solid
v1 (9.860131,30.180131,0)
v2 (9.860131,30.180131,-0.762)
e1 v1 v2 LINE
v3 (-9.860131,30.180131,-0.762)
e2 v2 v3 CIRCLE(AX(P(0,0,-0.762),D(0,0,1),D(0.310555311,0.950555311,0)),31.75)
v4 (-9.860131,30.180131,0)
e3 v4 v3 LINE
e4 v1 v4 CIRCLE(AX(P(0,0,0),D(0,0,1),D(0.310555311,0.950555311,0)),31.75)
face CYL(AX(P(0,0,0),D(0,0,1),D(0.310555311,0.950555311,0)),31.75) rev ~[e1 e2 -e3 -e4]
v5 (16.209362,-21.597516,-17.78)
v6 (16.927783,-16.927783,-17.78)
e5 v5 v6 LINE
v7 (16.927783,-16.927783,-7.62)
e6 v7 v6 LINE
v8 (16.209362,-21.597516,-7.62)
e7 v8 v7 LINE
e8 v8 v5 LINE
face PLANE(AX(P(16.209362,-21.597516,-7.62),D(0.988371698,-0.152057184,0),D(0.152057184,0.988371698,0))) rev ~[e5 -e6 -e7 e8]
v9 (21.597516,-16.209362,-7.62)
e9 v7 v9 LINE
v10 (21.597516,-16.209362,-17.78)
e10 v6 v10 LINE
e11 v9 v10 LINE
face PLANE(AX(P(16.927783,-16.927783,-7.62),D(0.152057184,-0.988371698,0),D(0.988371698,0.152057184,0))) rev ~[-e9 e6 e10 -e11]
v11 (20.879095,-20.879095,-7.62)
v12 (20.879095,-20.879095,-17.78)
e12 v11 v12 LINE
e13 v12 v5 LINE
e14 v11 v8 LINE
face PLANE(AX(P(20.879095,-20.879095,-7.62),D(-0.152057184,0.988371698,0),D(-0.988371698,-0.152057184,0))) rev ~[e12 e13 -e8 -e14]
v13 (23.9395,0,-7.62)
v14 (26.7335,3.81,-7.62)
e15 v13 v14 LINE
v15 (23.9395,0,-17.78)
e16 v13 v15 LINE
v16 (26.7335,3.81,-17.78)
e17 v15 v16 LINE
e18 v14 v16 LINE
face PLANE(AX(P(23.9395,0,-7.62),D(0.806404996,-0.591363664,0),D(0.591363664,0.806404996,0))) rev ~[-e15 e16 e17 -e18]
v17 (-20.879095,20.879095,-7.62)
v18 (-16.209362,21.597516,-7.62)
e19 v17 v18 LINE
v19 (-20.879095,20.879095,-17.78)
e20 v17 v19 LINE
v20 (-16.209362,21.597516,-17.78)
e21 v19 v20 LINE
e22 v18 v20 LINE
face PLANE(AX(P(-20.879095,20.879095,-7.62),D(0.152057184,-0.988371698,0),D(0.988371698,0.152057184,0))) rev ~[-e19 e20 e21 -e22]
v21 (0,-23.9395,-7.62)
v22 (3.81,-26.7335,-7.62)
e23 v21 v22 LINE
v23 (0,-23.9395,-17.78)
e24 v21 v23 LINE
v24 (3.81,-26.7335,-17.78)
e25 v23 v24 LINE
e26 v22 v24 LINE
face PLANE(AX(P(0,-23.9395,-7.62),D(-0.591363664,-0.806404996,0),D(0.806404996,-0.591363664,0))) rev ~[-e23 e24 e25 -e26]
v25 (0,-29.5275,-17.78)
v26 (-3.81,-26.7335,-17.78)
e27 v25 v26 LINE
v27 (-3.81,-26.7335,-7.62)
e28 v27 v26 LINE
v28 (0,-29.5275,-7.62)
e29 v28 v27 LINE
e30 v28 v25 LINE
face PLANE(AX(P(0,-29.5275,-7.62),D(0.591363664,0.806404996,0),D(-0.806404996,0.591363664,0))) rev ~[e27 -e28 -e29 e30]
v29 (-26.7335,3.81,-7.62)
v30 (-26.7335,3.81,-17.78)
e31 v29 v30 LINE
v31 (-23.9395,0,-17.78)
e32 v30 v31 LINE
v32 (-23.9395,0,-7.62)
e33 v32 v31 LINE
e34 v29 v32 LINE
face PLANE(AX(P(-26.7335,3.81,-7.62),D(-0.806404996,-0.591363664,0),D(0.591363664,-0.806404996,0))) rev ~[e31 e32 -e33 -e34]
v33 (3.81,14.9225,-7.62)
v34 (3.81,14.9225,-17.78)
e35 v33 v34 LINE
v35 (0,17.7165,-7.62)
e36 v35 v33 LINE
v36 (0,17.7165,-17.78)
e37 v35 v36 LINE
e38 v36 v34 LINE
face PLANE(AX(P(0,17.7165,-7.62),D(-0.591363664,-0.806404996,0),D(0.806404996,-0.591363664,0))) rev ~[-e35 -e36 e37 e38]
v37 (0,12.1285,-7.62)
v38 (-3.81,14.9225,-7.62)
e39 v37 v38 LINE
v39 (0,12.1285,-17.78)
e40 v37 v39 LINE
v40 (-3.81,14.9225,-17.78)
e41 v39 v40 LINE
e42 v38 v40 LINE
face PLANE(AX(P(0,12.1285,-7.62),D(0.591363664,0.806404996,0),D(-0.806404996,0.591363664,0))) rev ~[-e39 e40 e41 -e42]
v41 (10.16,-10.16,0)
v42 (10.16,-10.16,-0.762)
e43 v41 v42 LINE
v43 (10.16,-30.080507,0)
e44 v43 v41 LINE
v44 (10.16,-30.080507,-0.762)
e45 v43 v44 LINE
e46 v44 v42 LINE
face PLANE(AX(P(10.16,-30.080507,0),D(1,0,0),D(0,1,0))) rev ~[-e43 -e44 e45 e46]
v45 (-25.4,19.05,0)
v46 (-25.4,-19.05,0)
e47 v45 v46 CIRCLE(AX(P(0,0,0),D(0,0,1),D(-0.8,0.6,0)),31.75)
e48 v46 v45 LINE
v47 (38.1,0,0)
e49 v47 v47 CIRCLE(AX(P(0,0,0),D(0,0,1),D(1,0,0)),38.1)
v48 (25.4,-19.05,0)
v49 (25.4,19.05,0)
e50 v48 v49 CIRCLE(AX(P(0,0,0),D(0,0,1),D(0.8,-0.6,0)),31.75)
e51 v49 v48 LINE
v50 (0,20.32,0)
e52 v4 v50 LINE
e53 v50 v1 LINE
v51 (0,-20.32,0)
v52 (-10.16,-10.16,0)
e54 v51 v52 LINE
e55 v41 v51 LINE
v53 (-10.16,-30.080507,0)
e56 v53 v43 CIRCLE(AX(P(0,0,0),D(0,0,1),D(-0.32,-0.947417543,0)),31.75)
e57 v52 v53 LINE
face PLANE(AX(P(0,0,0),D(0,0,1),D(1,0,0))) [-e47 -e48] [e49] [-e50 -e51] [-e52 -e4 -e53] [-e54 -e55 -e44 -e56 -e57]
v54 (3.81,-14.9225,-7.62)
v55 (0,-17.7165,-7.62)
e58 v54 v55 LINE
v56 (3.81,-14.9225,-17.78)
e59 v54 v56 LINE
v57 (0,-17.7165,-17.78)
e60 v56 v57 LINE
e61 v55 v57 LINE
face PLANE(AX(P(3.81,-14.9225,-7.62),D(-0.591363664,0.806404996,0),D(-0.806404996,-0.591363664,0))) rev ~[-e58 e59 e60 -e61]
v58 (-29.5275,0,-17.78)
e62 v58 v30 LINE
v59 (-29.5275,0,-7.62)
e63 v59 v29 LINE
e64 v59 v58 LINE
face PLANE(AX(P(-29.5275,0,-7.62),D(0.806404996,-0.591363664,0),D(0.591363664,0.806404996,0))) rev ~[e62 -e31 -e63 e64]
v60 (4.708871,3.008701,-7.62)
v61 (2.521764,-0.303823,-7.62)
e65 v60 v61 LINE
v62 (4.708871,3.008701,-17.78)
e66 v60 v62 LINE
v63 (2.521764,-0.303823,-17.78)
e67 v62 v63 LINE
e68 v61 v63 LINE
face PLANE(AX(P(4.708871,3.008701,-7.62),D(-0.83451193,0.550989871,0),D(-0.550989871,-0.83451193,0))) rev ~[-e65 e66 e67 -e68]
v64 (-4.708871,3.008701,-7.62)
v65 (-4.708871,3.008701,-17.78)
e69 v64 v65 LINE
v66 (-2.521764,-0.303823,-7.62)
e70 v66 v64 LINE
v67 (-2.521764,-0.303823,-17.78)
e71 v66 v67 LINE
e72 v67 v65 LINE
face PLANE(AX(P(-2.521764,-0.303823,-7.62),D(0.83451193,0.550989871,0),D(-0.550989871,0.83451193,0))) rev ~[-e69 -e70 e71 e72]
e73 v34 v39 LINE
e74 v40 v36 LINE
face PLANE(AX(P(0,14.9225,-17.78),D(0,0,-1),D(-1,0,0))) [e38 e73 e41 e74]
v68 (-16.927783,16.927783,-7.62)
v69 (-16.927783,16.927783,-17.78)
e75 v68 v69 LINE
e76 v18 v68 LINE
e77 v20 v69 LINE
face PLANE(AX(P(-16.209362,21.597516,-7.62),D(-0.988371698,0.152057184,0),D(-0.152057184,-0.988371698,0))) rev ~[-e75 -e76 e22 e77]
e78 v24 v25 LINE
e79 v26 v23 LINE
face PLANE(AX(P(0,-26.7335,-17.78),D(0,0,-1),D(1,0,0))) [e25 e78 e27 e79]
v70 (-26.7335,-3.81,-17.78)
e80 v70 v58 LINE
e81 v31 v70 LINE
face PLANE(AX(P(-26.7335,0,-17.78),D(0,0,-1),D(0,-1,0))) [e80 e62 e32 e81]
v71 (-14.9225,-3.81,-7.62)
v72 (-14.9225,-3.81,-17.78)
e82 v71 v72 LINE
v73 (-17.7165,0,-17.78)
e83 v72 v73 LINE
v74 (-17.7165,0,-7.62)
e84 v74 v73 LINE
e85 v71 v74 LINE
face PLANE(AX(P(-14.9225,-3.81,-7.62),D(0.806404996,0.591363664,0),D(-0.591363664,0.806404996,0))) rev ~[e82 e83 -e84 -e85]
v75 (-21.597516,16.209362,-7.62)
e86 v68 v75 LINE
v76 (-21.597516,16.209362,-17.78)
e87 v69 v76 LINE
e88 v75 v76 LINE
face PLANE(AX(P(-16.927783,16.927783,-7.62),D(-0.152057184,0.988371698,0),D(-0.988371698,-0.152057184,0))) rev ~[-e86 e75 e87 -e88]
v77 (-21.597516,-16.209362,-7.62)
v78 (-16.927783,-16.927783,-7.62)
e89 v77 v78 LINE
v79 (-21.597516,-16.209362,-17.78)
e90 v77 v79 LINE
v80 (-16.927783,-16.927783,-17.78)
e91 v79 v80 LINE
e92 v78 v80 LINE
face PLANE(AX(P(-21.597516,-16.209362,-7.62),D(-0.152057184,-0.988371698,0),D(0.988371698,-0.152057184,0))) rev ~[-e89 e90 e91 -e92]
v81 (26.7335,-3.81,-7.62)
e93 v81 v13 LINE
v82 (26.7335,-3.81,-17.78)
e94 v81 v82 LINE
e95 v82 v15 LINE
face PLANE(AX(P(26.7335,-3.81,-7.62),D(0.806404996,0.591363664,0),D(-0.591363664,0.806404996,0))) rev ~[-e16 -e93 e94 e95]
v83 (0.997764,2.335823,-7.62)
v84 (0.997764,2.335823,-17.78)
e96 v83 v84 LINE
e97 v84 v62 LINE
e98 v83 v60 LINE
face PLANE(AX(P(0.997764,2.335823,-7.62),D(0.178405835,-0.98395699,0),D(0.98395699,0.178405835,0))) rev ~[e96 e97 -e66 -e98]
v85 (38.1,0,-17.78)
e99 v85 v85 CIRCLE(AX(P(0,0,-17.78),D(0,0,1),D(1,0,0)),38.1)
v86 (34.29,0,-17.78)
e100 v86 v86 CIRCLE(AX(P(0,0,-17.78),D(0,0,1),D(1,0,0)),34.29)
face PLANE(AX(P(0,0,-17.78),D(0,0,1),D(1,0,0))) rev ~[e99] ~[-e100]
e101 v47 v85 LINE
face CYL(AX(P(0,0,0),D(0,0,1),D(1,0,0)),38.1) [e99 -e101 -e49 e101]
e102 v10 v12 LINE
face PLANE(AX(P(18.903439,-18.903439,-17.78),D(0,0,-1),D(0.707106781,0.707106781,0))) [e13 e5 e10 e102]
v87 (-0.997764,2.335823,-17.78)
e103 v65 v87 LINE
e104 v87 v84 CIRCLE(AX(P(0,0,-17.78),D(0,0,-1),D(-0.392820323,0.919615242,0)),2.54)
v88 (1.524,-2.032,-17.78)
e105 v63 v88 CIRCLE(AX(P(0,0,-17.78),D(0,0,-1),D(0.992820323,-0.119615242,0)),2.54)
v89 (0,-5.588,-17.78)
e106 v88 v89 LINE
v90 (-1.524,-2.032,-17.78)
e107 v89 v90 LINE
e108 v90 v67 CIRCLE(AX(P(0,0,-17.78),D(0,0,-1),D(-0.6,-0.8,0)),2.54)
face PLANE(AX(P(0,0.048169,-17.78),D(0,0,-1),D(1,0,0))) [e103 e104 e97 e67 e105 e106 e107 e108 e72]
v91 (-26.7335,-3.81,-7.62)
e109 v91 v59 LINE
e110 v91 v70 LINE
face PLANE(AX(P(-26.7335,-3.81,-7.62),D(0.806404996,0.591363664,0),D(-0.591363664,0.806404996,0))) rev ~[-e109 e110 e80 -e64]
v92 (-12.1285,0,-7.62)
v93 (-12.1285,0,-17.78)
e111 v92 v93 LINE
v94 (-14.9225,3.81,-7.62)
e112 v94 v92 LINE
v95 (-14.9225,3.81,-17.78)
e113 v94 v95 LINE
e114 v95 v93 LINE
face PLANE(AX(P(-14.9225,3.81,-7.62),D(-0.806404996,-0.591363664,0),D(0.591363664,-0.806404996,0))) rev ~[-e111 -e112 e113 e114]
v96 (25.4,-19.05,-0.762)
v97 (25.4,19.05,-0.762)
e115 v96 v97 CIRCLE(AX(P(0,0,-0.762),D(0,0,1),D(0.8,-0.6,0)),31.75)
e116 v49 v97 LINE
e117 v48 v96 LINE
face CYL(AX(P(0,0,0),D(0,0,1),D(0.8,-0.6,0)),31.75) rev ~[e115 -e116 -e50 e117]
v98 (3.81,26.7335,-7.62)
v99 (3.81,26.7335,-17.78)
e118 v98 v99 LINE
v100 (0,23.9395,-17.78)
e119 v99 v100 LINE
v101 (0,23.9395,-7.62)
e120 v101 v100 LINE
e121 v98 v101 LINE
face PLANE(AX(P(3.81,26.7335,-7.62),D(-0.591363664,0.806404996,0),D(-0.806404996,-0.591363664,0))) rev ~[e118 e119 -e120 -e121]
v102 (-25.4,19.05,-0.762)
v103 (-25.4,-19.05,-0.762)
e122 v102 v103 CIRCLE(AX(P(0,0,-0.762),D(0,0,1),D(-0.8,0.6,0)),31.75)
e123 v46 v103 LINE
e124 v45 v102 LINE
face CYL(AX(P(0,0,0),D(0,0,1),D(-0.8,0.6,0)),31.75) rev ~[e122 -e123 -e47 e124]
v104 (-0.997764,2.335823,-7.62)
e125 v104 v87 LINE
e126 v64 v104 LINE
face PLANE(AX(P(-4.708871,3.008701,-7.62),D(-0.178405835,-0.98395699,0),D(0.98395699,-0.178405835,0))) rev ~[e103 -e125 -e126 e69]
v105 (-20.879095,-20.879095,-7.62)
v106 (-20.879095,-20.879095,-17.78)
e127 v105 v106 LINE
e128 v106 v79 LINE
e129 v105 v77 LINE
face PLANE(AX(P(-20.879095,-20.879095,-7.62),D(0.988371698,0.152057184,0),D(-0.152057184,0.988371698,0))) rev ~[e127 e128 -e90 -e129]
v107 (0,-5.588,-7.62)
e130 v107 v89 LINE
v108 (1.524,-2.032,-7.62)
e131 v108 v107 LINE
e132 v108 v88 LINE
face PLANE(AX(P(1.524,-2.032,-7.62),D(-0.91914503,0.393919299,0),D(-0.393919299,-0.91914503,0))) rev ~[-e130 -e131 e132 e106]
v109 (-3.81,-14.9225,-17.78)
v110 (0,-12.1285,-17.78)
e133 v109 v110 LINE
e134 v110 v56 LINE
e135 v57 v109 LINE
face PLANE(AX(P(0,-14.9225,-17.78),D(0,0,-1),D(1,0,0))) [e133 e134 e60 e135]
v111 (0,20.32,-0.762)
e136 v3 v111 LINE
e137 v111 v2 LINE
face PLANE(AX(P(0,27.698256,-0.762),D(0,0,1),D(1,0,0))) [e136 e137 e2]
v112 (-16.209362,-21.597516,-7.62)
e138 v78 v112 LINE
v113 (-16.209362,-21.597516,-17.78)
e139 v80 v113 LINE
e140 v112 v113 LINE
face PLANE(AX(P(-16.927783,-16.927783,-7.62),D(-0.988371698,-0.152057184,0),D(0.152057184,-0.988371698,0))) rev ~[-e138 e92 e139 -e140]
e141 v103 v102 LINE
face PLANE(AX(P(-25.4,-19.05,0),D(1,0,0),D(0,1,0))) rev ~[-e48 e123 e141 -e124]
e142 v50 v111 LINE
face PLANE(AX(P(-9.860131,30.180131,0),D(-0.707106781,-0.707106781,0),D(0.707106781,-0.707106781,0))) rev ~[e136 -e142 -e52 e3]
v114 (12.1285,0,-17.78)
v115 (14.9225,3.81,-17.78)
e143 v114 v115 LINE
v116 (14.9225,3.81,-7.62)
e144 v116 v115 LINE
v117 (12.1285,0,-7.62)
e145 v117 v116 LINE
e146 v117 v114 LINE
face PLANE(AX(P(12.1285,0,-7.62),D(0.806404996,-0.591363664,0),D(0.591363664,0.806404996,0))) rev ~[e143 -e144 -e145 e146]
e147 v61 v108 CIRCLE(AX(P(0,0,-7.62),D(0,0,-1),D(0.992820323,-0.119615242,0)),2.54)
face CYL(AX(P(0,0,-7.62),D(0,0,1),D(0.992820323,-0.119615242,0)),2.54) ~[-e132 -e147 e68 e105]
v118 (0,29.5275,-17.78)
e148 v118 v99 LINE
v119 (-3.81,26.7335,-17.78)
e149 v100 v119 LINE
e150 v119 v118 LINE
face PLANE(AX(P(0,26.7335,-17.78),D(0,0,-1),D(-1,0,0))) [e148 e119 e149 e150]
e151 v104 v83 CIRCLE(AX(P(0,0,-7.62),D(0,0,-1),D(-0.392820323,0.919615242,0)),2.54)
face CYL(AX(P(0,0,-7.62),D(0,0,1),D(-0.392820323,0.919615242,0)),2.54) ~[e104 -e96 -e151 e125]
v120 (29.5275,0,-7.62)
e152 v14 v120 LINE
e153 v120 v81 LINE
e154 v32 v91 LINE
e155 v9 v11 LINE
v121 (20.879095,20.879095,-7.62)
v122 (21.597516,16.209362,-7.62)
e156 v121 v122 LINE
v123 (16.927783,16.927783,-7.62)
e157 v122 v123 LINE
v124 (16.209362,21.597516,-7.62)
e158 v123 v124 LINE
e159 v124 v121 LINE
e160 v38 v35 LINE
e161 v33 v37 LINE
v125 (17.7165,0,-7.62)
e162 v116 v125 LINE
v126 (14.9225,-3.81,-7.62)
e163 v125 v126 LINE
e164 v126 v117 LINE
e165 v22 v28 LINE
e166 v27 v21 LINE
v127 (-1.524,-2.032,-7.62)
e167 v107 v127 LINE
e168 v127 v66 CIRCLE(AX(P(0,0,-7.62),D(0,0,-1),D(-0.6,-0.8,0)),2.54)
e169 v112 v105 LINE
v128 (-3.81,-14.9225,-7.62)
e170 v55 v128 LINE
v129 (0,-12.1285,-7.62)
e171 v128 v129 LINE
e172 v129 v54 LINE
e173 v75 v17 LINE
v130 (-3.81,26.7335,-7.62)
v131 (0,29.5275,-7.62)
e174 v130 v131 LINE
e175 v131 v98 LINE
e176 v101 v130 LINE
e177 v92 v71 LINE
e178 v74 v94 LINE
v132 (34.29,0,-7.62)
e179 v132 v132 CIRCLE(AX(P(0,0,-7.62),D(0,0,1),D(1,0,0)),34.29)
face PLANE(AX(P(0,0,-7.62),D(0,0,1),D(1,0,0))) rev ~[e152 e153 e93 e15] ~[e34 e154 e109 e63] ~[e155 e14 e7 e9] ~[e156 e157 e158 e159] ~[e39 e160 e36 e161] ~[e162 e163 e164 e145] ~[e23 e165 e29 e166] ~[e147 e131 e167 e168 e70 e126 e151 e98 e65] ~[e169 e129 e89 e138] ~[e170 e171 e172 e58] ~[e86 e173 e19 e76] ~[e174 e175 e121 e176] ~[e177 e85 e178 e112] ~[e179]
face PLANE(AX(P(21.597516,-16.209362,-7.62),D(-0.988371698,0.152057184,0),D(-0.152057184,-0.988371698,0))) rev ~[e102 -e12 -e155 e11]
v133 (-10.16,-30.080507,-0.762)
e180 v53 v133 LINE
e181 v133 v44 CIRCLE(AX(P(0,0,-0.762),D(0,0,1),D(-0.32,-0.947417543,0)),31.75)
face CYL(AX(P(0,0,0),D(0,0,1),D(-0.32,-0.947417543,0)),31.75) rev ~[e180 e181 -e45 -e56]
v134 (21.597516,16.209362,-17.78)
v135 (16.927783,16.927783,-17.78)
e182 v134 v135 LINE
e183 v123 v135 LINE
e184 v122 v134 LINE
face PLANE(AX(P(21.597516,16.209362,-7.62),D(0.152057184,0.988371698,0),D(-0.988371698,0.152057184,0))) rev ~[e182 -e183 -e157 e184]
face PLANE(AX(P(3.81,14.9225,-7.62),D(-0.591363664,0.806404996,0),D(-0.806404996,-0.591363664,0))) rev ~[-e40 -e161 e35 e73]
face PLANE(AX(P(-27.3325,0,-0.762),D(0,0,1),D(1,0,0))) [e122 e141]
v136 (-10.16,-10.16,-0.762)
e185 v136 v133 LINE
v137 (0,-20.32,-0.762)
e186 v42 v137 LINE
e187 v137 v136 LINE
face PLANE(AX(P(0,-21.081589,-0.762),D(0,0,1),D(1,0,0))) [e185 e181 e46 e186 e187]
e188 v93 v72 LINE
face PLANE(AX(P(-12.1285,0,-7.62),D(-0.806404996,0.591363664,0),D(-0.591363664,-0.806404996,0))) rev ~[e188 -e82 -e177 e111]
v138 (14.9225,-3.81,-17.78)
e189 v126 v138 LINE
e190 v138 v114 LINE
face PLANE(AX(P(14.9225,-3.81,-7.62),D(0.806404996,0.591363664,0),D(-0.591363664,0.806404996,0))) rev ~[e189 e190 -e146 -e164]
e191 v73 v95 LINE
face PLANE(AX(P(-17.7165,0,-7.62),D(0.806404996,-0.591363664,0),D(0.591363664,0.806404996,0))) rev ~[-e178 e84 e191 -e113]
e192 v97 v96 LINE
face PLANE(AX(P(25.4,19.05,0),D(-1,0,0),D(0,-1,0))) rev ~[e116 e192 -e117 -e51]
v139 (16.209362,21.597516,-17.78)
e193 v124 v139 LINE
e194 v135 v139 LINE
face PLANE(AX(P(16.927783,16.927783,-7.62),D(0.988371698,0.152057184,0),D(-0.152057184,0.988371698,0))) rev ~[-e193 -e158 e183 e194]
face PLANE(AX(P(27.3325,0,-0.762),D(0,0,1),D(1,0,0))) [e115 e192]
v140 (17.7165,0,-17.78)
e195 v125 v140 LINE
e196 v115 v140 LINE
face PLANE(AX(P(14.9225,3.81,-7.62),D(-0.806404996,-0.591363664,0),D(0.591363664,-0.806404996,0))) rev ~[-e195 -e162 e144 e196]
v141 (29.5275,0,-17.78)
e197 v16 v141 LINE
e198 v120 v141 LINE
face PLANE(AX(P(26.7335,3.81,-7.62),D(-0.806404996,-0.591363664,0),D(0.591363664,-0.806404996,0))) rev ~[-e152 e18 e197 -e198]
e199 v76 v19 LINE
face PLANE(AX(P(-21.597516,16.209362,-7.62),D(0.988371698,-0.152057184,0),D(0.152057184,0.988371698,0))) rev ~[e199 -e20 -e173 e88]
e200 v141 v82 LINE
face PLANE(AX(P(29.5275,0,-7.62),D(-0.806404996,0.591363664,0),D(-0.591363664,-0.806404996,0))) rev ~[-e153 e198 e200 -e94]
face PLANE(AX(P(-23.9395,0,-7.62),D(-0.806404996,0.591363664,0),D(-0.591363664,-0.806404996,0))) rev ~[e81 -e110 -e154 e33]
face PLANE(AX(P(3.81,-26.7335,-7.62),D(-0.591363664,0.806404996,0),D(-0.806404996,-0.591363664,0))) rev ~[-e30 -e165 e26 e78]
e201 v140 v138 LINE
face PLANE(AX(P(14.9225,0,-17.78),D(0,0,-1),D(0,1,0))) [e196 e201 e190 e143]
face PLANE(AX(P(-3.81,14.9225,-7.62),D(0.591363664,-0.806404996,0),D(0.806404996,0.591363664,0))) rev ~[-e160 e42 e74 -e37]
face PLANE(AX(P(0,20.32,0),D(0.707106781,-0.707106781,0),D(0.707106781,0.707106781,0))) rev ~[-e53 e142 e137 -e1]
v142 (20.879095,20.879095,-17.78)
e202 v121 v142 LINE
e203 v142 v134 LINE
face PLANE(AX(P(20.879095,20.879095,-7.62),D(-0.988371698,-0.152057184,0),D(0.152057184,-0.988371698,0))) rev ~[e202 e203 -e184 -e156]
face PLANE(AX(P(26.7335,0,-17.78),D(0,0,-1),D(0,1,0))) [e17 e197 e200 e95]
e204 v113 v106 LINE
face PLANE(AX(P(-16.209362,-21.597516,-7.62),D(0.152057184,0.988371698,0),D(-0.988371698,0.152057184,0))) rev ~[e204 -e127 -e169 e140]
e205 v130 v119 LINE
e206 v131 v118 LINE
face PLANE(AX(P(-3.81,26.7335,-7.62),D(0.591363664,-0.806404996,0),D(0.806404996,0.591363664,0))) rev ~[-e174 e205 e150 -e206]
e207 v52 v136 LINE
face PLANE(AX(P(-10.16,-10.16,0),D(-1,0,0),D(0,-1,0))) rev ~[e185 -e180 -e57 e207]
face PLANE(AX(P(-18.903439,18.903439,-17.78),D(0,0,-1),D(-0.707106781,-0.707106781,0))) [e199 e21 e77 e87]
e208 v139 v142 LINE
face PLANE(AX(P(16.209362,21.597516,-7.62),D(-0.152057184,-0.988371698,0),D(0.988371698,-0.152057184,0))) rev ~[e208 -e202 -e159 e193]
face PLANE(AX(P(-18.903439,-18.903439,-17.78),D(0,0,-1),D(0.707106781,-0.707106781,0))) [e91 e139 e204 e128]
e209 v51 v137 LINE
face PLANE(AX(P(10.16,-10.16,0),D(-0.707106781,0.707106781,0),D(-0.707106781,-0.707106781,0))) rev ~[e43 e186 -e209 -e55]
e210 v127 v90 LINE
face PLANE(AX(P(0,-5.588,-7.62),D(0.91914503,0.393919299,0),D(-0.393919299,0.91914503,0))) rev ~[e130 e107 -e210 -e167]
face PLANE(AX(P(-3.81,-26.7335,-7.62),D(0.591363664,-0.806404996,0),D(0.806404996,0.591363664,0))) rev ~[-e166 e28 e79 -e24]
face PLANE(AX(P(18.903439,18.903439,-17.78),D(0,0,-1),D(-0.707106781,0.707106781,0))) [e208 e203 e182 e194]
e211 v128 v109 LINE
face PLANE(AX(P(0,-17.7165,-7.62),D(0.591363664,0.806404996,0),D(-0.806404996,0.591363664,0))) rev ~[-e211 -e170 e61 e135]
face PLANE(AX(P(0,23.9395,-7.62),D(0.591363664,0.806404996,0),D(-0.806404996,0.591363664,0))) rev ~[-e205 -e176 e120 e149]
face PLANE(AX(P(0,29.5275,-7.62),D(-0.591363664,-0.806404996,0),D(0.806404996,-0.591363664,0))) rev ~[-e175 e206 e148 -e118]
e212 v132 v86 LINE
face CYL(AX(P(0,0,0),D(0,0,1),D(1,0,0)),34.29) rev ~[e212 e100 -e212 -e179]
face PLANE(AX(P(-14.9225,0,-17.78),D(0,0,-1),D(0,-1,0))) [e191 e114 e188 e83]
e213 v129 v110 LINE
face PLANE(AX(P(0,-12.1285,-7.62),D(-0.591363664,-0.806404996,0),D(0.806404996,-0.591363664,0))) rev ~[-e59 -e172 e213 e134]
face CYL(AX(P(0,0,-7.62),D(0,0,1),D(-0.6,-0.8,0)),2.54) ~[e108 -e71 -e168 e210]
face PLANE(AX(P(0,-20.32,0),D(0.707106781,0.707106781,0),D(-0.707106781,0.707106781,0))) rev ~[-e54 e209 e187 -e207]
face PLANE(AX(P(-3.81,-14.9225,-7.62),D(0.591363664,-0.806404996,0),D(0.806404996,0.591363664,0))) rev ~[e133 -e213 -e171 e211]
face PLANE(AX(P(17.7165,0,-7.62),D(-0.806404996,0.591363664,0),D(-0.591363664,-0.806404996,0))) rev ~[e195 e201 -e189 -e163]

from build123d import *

# Parameters (mm, degrees)
F0_R            = 38.1
F0_R_2          = 34.29
F1_DEPTH        = 7.62
F2_DEPTH        = 17.78
F4_DEPTH        = 10.16
F5_DEPTH        = 10.16
F5_COPIES_COUNT = 4
F6_DEPTH        = 10.16
F6_COPIES_COUNT = 8
F8_DEPTH        = 0.762


# Not quite as in the source:
# - a pattern or mirror of a feature is missing from the dataset's text; its kind, count and spacing are read off the source's solid


with BuildPart() as f1:
    # F0 (on Top) → F1 (new body)
    with BuildSketch(Plane.XY):
        Circle(F0_R)
        Circle(F0_R_2, mode=Mode.SUBTRACT)
        Circle(F0_R_2)
    extrude(amount=-F1_DEPTH)

    # F0 (on Top) → F2 (join)
    with BuildSketch(Plane.XY):
        Circle(F0_R)
        Circle(F0_R_2, mode=Mode.SUBTRACT)
    extrude(amount=-F2_DEPTH)

    # F3 (on face) → F4 (join)
    with BuildSketch(Plane(origin=(0, 0, -7.62), x_dir=(1, 0, 0), z_dir=(0, 0, -1))):
        with BuildLine():
            Line((-4.7088706862, -3.0087008594), (-0.9977636205, -2.3358227154))
            ThreePointArc((-0.9977636205, -2.3358227154), (0, -2.54), (0.9977636205, -2.3358227154))
            Line((0.9977636205, -2.3358227154), (4.7088706862, -3.0087008594))
            Line((4.7088706862, -3.0087008594), (2.5217636205, 0.3038227154))
            ThreePointArc((2.5217636205, 0.3038227154), (2.1997045256, 1.27), (1.524, 2.032))
            Line((1.524, 2.032), (0, 5.588))
            Line((0, 5.588), (-1.524, 2.032))
            ThreePointArc((-1.524, 2.032), (-2.1997045256, 1.27), (-2.5217636205, 0.3038227154))
            Line((-2.5217636205, 0.3038227154), (-4.7088706862, -3.0087008594))
        make_face()
    extrude(amount=F4_DEPTH)

    # F3 (on face) → F5 (join)
    with BuildSketch(Plane(origin=(0, 0, -7.62), x_dir=(1, 0, 0), z_dir=(0, 0, -1))):
        Polygon((3.81, 14.9225), (0, 17.7165), (-3.81, 14.9225), (0, 12.1285), align=None)
    f5 = extrude(amount=F5_DEPTH)

    # F5_copies: F5 ×4 about axis
    f5_copies_axis = Axis((0, 0, 0), (0, 0, 1))
    for i in range(1, F5_COPIES_COUNT):
        add(f5.rotate(f5_copies_axis, i * 360 / F5_COPIES_COUNT))

    # F3 (on face) → F6 (join)
    with BuildSketch(Plane(origin=(0, 0, -7.62), x_dir=(1, 0, 0), z_dir=(0, 0, -1))):
        Polygon((3.81, 26.7335), (0, 29.5275), (-3.81, 26.7335), (0, 23.9395), align=None)
    f6 = extrude(amount=F6_DEPTH)

    # F6_copies: F6 ×8 about axis
    f6_copies_axis = Axis((0, 0, 0), (0, 0, 1))
    for i in range(1, F6_COPIES_COUNT):
        add(f6.rotate(f6_copies_axis, i * 360 / F6_COPIES_COUNT))

    # F7 (on face) → F8 (cut)
    with BuildSketch(Plane.XY):
        with BuildLine():
            Line((-10.16, -10.16), (-10.16, -30.0805069771))
            ThreePointArc((-10.16, -30.0805069771), (0, -31.75), (10.16, -30.0805069771))
            Line((10.16, -30.0805069771), (10.16, -10.16))
            Line((10.16, -10.16), (0, -20.32))
            Line((0, -20.32), (-10.16, -10.16))
        make_face()
        with BuildLine():
            ThreePointArc((-25.4, 19.05), (-31.75, 0), (-25.4, -19.05))
            Line((-25.4, -19.05), (-25.4, 19.05))
        make_face()
        with BuildLine():
            ThreePointArc((25.4, -19.05), (31.75, 0), (25.4, 19.05))
            Line((25.4, 19.05), (25.4, -19.05))
        make_face()
        with BuildLine():
            ThreePointArc((9.8601311185, 30.1801311185), (0, 31.75), (-9.8601311185, 30.1801311185))
            Line((-9.8601311185, 30.1801311185), (0, 20.32))
            Line((0, 20.32), (9.8601311185, 30.1801311185))
        make_face()
    extrude(amount=-F8_DEPTH, mode=Mode.SUBTRACT)


solid = f1.part
